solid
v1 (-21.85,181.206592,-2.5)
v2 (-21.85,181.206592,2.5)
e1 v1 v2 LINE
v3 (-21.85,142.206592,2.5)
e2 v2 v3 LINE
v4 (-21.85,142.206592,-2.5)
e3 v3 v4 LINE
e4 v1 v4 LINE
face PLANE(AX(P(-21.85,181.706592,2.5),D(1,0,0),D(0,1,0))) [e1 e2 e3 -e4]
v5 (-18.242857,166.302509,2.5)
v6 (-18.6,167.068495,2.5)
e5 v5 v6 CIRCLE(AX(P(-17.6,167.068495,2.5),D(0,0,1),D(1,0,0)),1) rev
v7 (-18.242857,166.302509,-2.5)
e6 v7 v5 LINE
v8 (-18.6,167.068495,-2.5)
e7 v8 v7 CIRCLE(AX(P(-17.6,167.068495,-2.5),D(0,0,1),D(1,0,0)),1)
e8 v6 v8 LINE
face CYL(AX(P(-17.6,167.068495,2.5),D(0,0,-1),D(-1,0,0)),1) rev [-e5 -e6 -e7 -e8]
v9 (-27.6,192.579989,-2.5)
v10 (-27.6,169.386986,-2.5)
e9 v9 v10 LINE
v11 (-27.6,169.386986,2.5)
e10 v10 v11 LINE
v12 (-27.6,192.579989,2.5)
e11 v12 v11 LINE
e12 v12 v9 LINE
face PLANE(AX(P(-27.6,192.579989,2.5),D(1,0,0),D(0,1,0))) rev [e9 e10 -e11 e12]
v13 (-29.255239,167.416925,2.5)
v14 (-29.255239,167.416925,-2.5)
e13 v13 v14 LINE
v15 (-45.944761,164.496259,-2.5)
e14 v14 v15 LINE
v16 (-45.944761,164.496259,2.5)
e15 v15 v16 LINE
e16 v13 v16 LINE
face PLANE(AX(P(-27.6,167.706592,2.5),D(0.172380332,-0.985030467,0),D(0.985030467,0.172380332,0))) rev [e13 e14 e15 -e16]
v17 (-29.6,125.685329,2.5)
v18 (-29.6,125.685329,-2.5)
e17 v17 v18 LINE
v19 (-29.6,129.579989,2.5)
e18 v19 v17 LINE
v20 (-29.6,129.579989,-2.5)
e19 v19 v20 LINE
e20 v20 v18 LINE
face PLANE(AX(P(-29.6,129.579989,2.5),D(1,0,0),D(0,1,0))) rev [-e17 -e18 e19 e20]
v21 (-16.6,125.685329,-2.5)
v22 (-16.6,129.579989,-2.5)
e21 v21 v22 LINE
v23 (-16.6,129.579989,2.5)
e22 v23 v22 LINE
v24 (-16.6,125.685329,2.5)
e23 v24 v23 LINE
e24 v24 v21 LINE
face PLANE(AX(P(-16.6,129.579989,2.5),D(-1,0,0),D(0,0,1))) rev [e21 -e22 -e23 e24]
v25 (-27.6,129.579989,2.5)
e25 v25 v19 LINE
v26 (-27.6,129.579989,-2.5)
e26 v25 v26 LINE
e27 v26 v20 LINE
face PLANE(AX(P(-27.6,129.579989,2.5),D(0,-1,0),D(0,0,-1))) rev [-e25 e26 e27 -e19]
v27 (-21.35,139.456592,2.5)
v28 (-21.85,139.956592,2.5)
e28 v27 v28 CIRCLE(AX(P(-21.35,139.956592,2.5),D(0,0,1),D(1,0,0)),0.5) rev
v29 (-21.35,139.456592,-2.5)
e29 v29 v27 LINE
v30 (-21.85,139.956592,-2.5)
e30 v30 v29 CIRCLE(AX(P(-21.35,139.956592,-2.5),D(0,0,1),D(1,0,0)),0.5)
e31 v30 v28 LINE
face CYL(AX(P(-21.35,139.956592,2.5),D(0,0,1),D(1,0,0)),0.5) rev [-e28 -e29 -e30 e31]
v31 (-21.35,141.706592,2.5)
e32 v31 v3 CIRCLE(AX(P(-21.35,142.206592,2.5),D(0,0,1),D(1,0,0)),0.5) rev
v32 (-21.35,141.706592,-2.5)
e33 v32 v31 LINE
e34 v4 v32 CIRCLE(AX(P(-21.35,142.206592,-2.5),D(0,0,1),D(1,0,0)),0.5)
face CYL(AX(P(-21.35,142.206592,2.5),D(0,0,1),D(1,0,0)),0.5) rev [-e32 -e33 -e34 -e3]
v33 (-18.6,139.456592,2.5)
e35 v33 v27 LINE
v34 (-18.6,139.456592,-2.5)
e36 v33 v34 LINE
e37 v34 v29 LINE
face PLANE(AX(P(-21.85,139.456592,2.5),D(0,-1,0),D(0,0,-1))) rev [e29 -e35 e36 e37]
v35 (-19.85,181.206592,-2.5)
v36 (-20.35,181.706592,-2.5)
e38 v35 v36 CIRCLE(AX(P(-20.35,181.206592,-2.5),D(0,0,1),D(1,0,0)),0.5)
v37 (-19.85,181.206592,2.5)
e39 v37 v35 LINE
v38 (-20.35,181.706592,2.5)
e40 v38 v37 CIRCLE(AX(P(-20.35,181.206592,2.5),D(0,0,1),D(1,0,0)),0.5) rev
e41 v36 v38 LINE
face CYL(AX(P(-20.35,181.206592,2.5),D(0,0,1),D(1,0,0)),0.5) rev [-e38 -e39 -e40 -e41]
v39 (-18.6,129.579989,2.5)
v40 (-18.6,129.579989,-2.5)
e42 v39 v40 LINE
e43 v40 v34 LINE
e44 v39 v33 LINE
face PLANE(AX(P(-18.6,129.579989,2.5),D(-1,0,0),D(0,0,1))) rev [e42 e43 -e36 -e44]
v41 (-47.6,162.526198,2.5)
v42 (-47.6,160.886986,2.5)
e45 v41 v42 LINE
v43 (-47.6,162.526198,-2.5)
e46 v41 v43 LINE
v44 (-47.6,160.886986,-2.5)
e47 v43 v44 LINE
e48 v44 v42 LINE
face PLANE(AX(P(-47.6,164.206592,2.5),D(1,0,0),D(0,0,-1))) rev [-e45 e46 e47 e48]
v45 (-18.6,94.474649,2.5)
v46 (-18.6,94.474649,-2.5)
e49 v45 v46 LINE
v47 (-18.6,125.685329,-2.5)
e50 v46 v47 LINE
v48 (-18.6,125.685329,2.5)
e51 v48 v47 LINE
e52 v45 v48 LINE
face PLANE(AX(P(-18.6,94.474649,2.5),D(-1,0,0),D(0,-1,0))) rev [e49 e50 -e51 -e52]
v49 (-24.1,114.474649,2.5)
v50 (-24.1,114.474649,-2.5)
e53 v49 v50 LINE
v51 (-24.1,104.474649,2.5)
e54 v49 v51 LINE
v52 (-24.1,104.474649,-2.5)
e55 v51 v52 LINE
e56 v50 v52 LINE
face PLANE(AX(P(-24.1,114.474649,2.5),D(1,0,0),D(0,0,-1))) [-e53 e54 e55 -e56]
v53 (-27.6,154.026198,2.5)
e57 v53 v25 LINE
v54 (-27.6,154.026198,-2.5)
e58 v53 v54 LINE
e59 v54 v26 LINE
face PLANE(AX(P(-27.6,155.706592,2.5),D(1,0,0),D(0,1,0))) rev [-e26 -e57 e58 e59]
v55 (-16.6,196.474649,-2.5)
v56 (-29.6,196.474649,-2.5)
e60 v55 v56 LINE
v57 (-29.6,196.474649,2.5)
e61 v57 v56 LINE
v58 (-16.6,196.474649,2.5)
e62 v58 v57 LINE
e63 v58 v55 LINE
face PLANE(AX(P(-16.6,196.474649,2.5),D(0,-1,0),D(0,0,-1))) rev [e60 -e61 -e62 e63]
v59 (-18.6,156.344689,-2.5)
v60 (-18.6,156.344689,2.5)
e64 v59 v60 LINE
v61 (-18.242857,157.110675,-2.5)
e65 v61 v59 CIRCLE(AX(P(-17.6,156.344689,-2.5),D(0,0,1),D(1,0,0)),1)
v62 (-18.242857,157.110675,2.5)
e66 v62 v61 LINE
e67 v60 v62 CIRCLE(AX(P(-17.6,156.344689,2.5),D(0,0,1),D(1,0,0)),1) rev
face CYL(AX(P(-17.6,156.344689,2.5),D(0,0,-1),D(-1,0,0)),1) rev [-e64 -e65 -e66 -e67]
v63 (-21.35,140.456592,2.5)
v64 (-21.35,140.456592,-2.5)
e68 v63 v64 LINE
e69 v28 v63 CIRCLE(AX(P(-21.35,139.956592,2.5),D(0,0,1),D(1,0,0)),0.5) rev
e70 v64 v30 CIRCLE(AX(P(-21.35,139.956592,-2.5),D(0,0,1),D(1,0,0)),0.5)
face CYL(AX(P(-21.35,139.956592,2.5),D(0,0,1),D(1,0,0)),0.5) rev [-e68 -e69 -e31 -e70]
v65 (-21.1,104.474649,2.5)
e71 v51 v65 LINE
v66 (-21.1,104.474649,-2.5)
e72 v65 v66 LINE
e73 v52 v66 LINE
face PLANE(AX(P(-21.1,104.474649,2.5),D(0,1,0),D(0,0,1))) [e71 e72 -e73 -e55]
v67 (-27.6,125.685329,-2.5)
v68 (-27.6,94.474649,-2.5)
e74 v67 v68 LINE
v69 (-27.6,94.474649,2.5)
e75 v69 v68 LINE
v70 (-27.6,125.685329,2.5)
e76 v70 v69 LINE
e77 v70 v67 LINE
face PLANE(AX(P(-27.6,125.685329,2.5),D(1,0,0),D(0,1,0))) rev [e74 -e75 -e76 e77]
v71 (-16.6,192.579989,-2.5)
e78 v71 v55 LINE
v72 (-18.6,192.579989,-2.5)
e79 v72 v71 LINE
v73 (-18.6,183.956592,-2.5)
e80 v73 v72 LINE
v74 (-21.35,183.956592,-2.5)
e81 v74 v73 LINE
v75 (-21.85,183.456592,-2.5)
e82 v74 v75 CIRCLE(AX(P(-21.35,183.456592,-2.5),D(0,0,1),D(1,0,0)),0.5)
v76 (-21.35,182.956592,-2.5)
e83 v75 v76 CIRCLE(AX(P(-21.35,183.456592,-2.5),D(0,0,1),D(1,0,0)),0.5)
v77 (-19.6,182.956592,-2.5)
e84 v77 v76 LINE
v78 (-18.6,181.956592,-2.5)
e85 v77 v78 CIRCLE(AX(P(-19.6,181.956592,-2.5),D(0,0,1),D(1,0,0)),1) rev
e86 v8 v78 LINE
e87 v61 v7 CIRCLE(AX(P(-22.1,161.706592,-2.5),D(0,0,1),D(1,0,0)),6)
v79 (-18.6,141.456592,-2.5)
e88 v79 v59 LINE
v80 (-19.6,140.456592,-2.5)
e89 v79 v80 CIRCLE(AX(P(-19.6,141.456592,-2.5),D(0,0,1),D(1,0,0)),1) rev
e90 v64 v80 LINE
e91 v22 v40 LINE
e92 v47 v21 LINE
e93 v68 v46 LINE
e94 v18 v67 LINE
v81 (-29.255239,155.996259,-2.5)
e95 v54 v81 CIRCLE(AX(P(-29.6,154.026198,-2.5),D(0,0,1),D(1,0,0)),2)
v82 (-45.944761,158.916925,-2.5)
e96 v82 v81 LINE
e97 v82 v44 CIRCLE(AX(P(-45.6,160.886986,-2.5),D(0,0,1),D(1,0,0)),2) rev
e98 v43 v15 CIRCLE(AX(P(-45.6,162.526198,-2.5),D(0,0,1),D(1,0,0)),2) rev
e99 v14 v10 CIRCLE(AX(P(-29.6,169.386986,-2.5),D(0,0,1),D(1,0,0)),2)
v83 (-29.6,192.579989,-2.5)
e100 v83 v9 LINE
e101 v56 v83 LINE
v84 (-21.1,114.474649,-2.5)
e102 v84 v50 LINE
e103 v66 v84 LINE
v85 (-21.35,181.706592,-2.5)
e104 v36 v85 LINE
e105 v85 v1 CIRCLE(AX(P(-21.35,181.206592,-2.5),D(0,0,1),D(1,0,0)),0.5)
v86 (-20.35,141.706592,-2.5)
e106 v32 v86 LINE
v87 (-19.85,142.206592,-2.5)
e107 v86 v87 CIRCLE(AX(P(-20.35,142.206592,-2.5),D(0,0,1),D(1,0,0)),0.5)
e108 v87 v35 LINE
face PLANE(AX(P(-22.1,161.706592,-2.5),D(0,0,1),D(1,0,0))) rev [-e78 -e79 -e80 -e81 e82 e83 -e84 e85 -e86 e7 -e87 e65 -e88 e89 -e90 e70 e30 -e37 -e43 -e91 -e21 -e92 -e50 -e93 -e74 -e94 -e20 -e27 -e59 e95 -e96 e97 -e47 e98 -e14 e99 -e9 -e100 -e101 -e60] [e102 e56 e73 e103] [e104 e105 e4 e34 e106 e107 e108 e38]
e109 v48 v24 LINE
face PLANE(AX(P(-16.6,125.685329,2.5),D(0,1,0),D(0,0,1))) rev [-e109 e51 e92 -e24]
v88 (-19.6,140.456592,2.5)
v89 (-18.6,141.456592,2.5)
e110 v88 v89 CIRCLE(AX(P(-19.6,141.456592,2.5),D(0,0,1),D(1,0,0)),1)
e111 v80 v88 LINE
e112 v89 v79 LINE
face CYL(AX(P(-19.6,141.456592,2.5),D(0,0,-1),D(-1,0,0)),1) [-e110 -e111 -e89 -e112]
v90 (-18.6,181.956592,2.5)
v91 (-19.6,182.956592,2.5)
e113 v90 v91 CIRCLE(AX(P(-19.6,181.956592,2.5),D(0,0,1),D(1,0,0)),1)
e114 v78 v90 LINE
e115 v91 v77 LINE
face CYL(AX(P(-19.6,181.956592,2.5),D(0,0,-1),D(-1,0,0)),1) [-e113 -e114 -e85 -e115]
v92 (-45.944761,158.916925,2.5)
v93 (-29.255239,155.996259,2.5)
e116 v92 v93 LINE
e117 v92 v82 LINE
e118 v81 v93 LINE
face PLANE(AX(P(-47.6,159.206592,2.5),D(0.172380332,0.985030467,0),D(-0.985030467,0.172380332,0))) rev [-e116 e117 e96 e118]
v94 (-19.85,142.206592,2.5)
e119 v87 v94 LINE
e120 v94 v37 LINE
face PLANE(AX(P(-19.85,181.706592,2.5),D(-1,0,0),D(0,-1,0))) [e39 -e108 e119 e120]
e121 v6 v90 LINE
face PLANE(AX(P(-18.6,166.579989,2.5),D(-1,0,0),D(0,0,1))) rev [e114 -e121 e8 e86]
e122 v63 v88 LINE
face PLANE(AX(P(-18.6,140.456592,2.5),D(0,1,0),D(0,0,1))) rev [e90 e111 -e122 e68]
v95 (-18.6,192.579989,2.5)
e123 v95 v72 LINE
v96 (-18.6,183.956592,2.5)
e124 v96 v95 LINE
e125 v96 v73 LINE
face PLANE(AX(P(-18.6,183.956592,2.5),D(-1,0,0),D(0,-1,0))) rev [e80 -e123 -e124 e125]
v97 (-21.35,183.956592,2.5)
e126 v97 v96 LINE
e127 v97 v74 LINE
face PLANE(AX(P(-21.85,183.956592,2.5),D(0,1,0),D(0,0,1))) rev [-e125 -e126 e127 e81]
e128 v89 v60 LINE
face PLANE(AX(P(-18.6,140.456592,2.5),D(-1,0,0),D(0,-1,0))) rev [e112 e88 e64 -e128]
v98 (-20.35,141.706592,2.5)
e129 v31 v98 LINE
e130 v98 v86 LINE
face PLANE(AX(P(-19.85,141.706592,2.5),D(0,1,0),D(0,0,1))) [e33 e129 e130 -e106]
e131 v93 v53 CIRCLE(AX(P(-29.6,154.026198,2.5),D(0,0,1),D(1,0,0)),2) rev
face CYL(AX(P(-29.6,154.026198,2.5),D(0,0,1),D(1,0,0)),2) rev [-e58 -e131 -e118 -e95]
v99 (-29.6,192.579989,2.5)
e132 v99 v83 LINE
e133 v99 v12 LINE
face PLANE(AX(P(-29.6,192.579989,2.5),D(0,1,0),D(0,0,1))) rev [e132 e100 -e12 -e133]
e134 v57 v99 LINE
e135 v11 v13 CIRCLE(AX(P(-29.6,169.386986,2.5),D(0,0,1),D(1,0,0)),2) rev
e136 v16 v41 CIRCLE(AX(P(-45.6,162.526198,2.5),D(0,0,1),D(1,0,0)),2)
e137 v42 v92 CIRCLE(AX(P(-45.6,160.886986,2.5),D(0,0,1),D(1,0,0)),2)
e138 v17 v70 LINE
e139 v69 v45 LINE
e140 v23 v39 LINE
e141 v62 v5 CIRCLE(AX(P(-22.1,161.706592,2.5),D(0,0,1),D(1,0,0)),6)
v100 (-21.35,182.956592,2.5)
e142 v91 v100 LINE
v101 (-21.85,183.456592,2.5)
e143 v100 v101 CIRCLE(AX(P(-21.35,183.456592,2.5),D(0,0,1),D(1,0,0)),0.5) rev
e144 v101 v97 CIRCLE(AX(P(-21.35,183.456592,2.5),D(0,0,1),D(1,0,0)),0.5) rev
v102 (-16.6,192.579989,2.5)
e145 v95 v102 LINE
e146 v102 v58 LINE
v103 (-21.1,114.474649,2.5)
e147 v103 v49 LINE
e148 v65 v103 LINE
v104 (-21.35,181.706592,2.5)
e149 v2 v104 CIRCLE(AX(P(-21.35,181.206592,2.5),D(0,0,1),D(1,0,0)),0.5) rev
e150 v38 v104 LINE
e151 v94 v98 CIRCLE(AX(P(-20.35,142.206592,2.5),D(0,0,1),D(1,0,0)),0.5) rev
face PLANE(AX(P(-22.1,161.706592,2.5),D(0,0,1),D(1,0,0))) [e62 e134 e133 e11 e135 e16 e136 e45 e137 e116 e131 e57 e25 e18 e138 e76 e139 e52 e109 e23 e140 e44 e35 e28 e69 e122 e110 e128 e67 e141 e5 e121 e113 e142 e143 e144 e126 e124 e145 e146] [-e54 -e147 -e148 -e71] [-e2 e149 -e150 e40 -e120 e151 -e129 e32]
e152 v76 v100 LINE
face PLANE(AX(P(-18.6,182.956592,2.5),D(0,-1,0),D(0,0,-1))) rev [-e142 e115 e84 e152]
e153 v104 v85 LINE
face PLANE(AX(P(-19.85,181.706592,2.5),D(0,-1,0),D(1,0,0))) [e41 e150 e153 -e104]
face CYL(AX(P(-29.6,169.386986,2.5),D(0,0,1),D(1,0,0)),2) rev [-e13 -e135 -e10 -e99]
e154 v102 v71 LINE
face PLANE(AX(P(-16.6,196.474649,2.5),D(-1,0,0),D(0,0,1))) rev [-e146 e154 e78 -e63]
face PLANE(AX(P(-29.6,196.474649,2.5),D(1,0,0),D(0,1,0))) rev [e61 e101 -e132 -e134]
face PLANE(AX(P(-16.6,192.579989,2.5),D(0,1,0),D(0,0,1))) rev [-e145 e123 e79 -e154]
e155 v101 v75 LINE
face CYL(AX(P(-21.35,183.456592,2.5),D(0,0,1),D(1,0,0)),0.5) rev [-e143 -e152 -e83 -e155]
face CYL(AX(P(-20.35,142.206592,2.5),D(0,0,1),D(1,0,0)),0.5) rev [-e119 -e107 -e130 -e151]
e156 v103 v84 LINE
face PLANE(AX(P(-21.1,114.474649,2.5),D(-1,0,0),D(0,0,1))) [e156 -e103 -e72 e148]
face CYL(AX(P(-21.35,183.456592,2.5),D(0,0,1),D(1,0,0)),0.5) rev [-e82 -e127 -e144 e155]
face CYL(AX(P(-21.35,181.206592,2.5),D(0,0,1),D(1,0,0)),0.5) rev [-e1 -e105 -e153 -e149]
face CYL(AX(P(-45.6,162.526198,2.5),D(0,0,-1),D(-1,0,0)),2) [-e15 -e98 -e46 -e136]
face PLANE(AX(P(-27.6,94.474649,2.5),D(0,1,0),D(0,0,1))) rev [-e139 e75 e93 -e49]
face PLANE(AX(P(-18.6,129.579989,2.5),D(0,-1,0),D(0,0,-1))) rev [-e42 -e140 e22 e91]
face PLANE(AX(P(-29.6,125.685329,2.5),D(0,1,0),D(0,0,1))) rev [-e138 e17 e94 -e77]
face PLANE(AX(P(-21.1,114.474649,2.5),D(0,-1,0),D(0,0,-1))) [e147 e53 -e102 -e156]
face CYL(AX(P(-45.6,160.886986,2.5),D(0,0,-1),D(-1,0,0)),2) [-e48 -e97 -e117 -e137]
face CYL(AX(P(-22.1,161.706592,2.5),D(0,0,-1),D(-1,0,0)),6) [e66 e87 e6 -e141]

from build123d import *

# Parameters (mm, degrees)
SKETCH1_W           = 2
SKETCH1_H           = 40
SKETCH1_W_2         = 3
SKETCH1_H_2         = 10
BOSS_EXTRUDE1_DEPTH = 2.5
FILLET1_R           = 0.5
FILLET2_R           = 1
FILLET3_R           = 1
FILLET4_R           = 2


with BuildPart() as part:
    # Sketch1 → Boss-Extrude1 (new, symmetric)
    with BuildSketch(Plane.XY):
        with BuildLine():
            Line((-18.6, 166.579989158), (-18.6, 182.956591985))
            Line((-18.6, 182.956591985), (-21.85, 182.956591985))
            Line((-21.85, 182.956591985), (-21.85, 183.956591985))
            Line((-21.85, 183.956591985), (-18.6, 183.956591985))
            Line((-18.6, 183.956591985), (-18.6, 192.579989158))
            Line((-18.6, 192.579989158), (-16.6, 192.579989158))
            Line((-16.6, 192.579989158), (-16.6, 196.474649456))
            Line((-16.6, 196.474649456), (-29.6, 196.474649456))
            Line((-29.6, 196.474649456), (-29.6, 192.579989158))
            Line((-29.6, 192.579989158), (-27.6, 192.579989158))
            Line((-27.6, 192.579989158), (-27.6, 167.706591985))
            Line((-27.6, 167.706591985), (-47.6, 164.206591985))
            Line((-47.6, 164.206591985), (-47.6, 159.206591985))
            Line((-47.6, 159.206591985), (-27.6, 155.706591985))
            Line((-27.6, 155.706591985), (-27.6, 129.579989158))
            Line((-27.6, 129.579989158), (-29.6, 129.579989158))
            Line((-29.6, 129.579989158), (-29.6, 125.685328859))
            Line((-29.6, 125.685328859), (-27.6, 125.685328859))
            Line((-27.6, 125.685328859), (-27.6, 94.474649456))
            Line((-27.6, 94.474649456), (-18.6, 94.474649456))
            Line((-18.6, 94.474649456), (-18.6, 125.685328859))
            Line((-18.6, 125.685328859), (-16.6, 125.685328859))
            Line((-16.6, 125.685328859), (-16.6, 129.579989158))
            Line((-16.6, 129.579989158), (-18.6, 129.579989158))
            Line((-18.6, 129.579989158), (-18.6, 139.456591985))
            Line((-18.6, 139.456591985), (-21.85, 139.456591985))
            Line((-21.85, 139.456591985), (-21.85, 140.456591985))
            Line((-21.85, 140.456591985), (-18.6, 140.456591985))
            Line((-18.6, 140.456591985), (-18.6, 156.833194813))
            ThreePointArc((-18.6, 156.833194813), (-16.1, 161.706591985), (-18.6, 166.579989158))
        make_face()
        with Locations((-20.85, 161.706591985)):
            Rectangle(SKETCH1_W, SKETCH1_H, mode=Mode.SUBTRACT)
        with Locations((-22.6, 109.474649456)):
            Rectangle(SKETCH1_W_2, SKETCH1_H_2, mode=Mode.SUBTRACT)
    extrude(amount=BOSS_EXTRUDE1_DEPTH, both=True)

    # Fillet1
    fillet1_edges = [part.edges().sort_by_distance(p)[0] for p in [
        (-21.85, 183.956591985, 0),
        (-21.85, 182.956591985, 0),
        (-21.85, 140.456591985, 0),
        (-21.85, 139.456591985, 0),
        (-21.85, 181.706591985, 0),
        (-21.85, 141.706591985, 0),
        (-19.85, 141.706591985, 0),
        (-19.85, 181.706591985, 0),
    ]]
    fillet(fillet1_edges, radius=FILLET1_R - 0.0001)  # a hair under: the kernel refuses the full size

    # Fillet2
    fillet2_edges = [part.edges().sort_by_distance(p)[0] for p in [
        (-18.6, 182.956591985, 0),
        (-18.6, 140.456591985, 0),
    ]]
    fillet(fillet2_edges, radius=FILLET2_R)

    # Fillet3
    fillet3_edges = [part.edges().sort_by_distance(p)[0] for p in [
        (-18.6, 166.579989158, 0),
        (-18.6, 156.833194813, 0),
    ]]
    fillet(fillet3_edges, radius=FILLET3_R)

    # Fillet4
    fillet4_edges = [part.edges().sort_by_distance(p)[0] for p in [
        (-27.6, 155.706591985, 0),
        (-47.6, 159.206591985, 0),
        (-47.6, 164.206591985, 0),
        (-27.6, 167.706591985, 0),
    ]]
    fillet(fillet4_edges, radius=FILLET4_R)


solid = part.part
